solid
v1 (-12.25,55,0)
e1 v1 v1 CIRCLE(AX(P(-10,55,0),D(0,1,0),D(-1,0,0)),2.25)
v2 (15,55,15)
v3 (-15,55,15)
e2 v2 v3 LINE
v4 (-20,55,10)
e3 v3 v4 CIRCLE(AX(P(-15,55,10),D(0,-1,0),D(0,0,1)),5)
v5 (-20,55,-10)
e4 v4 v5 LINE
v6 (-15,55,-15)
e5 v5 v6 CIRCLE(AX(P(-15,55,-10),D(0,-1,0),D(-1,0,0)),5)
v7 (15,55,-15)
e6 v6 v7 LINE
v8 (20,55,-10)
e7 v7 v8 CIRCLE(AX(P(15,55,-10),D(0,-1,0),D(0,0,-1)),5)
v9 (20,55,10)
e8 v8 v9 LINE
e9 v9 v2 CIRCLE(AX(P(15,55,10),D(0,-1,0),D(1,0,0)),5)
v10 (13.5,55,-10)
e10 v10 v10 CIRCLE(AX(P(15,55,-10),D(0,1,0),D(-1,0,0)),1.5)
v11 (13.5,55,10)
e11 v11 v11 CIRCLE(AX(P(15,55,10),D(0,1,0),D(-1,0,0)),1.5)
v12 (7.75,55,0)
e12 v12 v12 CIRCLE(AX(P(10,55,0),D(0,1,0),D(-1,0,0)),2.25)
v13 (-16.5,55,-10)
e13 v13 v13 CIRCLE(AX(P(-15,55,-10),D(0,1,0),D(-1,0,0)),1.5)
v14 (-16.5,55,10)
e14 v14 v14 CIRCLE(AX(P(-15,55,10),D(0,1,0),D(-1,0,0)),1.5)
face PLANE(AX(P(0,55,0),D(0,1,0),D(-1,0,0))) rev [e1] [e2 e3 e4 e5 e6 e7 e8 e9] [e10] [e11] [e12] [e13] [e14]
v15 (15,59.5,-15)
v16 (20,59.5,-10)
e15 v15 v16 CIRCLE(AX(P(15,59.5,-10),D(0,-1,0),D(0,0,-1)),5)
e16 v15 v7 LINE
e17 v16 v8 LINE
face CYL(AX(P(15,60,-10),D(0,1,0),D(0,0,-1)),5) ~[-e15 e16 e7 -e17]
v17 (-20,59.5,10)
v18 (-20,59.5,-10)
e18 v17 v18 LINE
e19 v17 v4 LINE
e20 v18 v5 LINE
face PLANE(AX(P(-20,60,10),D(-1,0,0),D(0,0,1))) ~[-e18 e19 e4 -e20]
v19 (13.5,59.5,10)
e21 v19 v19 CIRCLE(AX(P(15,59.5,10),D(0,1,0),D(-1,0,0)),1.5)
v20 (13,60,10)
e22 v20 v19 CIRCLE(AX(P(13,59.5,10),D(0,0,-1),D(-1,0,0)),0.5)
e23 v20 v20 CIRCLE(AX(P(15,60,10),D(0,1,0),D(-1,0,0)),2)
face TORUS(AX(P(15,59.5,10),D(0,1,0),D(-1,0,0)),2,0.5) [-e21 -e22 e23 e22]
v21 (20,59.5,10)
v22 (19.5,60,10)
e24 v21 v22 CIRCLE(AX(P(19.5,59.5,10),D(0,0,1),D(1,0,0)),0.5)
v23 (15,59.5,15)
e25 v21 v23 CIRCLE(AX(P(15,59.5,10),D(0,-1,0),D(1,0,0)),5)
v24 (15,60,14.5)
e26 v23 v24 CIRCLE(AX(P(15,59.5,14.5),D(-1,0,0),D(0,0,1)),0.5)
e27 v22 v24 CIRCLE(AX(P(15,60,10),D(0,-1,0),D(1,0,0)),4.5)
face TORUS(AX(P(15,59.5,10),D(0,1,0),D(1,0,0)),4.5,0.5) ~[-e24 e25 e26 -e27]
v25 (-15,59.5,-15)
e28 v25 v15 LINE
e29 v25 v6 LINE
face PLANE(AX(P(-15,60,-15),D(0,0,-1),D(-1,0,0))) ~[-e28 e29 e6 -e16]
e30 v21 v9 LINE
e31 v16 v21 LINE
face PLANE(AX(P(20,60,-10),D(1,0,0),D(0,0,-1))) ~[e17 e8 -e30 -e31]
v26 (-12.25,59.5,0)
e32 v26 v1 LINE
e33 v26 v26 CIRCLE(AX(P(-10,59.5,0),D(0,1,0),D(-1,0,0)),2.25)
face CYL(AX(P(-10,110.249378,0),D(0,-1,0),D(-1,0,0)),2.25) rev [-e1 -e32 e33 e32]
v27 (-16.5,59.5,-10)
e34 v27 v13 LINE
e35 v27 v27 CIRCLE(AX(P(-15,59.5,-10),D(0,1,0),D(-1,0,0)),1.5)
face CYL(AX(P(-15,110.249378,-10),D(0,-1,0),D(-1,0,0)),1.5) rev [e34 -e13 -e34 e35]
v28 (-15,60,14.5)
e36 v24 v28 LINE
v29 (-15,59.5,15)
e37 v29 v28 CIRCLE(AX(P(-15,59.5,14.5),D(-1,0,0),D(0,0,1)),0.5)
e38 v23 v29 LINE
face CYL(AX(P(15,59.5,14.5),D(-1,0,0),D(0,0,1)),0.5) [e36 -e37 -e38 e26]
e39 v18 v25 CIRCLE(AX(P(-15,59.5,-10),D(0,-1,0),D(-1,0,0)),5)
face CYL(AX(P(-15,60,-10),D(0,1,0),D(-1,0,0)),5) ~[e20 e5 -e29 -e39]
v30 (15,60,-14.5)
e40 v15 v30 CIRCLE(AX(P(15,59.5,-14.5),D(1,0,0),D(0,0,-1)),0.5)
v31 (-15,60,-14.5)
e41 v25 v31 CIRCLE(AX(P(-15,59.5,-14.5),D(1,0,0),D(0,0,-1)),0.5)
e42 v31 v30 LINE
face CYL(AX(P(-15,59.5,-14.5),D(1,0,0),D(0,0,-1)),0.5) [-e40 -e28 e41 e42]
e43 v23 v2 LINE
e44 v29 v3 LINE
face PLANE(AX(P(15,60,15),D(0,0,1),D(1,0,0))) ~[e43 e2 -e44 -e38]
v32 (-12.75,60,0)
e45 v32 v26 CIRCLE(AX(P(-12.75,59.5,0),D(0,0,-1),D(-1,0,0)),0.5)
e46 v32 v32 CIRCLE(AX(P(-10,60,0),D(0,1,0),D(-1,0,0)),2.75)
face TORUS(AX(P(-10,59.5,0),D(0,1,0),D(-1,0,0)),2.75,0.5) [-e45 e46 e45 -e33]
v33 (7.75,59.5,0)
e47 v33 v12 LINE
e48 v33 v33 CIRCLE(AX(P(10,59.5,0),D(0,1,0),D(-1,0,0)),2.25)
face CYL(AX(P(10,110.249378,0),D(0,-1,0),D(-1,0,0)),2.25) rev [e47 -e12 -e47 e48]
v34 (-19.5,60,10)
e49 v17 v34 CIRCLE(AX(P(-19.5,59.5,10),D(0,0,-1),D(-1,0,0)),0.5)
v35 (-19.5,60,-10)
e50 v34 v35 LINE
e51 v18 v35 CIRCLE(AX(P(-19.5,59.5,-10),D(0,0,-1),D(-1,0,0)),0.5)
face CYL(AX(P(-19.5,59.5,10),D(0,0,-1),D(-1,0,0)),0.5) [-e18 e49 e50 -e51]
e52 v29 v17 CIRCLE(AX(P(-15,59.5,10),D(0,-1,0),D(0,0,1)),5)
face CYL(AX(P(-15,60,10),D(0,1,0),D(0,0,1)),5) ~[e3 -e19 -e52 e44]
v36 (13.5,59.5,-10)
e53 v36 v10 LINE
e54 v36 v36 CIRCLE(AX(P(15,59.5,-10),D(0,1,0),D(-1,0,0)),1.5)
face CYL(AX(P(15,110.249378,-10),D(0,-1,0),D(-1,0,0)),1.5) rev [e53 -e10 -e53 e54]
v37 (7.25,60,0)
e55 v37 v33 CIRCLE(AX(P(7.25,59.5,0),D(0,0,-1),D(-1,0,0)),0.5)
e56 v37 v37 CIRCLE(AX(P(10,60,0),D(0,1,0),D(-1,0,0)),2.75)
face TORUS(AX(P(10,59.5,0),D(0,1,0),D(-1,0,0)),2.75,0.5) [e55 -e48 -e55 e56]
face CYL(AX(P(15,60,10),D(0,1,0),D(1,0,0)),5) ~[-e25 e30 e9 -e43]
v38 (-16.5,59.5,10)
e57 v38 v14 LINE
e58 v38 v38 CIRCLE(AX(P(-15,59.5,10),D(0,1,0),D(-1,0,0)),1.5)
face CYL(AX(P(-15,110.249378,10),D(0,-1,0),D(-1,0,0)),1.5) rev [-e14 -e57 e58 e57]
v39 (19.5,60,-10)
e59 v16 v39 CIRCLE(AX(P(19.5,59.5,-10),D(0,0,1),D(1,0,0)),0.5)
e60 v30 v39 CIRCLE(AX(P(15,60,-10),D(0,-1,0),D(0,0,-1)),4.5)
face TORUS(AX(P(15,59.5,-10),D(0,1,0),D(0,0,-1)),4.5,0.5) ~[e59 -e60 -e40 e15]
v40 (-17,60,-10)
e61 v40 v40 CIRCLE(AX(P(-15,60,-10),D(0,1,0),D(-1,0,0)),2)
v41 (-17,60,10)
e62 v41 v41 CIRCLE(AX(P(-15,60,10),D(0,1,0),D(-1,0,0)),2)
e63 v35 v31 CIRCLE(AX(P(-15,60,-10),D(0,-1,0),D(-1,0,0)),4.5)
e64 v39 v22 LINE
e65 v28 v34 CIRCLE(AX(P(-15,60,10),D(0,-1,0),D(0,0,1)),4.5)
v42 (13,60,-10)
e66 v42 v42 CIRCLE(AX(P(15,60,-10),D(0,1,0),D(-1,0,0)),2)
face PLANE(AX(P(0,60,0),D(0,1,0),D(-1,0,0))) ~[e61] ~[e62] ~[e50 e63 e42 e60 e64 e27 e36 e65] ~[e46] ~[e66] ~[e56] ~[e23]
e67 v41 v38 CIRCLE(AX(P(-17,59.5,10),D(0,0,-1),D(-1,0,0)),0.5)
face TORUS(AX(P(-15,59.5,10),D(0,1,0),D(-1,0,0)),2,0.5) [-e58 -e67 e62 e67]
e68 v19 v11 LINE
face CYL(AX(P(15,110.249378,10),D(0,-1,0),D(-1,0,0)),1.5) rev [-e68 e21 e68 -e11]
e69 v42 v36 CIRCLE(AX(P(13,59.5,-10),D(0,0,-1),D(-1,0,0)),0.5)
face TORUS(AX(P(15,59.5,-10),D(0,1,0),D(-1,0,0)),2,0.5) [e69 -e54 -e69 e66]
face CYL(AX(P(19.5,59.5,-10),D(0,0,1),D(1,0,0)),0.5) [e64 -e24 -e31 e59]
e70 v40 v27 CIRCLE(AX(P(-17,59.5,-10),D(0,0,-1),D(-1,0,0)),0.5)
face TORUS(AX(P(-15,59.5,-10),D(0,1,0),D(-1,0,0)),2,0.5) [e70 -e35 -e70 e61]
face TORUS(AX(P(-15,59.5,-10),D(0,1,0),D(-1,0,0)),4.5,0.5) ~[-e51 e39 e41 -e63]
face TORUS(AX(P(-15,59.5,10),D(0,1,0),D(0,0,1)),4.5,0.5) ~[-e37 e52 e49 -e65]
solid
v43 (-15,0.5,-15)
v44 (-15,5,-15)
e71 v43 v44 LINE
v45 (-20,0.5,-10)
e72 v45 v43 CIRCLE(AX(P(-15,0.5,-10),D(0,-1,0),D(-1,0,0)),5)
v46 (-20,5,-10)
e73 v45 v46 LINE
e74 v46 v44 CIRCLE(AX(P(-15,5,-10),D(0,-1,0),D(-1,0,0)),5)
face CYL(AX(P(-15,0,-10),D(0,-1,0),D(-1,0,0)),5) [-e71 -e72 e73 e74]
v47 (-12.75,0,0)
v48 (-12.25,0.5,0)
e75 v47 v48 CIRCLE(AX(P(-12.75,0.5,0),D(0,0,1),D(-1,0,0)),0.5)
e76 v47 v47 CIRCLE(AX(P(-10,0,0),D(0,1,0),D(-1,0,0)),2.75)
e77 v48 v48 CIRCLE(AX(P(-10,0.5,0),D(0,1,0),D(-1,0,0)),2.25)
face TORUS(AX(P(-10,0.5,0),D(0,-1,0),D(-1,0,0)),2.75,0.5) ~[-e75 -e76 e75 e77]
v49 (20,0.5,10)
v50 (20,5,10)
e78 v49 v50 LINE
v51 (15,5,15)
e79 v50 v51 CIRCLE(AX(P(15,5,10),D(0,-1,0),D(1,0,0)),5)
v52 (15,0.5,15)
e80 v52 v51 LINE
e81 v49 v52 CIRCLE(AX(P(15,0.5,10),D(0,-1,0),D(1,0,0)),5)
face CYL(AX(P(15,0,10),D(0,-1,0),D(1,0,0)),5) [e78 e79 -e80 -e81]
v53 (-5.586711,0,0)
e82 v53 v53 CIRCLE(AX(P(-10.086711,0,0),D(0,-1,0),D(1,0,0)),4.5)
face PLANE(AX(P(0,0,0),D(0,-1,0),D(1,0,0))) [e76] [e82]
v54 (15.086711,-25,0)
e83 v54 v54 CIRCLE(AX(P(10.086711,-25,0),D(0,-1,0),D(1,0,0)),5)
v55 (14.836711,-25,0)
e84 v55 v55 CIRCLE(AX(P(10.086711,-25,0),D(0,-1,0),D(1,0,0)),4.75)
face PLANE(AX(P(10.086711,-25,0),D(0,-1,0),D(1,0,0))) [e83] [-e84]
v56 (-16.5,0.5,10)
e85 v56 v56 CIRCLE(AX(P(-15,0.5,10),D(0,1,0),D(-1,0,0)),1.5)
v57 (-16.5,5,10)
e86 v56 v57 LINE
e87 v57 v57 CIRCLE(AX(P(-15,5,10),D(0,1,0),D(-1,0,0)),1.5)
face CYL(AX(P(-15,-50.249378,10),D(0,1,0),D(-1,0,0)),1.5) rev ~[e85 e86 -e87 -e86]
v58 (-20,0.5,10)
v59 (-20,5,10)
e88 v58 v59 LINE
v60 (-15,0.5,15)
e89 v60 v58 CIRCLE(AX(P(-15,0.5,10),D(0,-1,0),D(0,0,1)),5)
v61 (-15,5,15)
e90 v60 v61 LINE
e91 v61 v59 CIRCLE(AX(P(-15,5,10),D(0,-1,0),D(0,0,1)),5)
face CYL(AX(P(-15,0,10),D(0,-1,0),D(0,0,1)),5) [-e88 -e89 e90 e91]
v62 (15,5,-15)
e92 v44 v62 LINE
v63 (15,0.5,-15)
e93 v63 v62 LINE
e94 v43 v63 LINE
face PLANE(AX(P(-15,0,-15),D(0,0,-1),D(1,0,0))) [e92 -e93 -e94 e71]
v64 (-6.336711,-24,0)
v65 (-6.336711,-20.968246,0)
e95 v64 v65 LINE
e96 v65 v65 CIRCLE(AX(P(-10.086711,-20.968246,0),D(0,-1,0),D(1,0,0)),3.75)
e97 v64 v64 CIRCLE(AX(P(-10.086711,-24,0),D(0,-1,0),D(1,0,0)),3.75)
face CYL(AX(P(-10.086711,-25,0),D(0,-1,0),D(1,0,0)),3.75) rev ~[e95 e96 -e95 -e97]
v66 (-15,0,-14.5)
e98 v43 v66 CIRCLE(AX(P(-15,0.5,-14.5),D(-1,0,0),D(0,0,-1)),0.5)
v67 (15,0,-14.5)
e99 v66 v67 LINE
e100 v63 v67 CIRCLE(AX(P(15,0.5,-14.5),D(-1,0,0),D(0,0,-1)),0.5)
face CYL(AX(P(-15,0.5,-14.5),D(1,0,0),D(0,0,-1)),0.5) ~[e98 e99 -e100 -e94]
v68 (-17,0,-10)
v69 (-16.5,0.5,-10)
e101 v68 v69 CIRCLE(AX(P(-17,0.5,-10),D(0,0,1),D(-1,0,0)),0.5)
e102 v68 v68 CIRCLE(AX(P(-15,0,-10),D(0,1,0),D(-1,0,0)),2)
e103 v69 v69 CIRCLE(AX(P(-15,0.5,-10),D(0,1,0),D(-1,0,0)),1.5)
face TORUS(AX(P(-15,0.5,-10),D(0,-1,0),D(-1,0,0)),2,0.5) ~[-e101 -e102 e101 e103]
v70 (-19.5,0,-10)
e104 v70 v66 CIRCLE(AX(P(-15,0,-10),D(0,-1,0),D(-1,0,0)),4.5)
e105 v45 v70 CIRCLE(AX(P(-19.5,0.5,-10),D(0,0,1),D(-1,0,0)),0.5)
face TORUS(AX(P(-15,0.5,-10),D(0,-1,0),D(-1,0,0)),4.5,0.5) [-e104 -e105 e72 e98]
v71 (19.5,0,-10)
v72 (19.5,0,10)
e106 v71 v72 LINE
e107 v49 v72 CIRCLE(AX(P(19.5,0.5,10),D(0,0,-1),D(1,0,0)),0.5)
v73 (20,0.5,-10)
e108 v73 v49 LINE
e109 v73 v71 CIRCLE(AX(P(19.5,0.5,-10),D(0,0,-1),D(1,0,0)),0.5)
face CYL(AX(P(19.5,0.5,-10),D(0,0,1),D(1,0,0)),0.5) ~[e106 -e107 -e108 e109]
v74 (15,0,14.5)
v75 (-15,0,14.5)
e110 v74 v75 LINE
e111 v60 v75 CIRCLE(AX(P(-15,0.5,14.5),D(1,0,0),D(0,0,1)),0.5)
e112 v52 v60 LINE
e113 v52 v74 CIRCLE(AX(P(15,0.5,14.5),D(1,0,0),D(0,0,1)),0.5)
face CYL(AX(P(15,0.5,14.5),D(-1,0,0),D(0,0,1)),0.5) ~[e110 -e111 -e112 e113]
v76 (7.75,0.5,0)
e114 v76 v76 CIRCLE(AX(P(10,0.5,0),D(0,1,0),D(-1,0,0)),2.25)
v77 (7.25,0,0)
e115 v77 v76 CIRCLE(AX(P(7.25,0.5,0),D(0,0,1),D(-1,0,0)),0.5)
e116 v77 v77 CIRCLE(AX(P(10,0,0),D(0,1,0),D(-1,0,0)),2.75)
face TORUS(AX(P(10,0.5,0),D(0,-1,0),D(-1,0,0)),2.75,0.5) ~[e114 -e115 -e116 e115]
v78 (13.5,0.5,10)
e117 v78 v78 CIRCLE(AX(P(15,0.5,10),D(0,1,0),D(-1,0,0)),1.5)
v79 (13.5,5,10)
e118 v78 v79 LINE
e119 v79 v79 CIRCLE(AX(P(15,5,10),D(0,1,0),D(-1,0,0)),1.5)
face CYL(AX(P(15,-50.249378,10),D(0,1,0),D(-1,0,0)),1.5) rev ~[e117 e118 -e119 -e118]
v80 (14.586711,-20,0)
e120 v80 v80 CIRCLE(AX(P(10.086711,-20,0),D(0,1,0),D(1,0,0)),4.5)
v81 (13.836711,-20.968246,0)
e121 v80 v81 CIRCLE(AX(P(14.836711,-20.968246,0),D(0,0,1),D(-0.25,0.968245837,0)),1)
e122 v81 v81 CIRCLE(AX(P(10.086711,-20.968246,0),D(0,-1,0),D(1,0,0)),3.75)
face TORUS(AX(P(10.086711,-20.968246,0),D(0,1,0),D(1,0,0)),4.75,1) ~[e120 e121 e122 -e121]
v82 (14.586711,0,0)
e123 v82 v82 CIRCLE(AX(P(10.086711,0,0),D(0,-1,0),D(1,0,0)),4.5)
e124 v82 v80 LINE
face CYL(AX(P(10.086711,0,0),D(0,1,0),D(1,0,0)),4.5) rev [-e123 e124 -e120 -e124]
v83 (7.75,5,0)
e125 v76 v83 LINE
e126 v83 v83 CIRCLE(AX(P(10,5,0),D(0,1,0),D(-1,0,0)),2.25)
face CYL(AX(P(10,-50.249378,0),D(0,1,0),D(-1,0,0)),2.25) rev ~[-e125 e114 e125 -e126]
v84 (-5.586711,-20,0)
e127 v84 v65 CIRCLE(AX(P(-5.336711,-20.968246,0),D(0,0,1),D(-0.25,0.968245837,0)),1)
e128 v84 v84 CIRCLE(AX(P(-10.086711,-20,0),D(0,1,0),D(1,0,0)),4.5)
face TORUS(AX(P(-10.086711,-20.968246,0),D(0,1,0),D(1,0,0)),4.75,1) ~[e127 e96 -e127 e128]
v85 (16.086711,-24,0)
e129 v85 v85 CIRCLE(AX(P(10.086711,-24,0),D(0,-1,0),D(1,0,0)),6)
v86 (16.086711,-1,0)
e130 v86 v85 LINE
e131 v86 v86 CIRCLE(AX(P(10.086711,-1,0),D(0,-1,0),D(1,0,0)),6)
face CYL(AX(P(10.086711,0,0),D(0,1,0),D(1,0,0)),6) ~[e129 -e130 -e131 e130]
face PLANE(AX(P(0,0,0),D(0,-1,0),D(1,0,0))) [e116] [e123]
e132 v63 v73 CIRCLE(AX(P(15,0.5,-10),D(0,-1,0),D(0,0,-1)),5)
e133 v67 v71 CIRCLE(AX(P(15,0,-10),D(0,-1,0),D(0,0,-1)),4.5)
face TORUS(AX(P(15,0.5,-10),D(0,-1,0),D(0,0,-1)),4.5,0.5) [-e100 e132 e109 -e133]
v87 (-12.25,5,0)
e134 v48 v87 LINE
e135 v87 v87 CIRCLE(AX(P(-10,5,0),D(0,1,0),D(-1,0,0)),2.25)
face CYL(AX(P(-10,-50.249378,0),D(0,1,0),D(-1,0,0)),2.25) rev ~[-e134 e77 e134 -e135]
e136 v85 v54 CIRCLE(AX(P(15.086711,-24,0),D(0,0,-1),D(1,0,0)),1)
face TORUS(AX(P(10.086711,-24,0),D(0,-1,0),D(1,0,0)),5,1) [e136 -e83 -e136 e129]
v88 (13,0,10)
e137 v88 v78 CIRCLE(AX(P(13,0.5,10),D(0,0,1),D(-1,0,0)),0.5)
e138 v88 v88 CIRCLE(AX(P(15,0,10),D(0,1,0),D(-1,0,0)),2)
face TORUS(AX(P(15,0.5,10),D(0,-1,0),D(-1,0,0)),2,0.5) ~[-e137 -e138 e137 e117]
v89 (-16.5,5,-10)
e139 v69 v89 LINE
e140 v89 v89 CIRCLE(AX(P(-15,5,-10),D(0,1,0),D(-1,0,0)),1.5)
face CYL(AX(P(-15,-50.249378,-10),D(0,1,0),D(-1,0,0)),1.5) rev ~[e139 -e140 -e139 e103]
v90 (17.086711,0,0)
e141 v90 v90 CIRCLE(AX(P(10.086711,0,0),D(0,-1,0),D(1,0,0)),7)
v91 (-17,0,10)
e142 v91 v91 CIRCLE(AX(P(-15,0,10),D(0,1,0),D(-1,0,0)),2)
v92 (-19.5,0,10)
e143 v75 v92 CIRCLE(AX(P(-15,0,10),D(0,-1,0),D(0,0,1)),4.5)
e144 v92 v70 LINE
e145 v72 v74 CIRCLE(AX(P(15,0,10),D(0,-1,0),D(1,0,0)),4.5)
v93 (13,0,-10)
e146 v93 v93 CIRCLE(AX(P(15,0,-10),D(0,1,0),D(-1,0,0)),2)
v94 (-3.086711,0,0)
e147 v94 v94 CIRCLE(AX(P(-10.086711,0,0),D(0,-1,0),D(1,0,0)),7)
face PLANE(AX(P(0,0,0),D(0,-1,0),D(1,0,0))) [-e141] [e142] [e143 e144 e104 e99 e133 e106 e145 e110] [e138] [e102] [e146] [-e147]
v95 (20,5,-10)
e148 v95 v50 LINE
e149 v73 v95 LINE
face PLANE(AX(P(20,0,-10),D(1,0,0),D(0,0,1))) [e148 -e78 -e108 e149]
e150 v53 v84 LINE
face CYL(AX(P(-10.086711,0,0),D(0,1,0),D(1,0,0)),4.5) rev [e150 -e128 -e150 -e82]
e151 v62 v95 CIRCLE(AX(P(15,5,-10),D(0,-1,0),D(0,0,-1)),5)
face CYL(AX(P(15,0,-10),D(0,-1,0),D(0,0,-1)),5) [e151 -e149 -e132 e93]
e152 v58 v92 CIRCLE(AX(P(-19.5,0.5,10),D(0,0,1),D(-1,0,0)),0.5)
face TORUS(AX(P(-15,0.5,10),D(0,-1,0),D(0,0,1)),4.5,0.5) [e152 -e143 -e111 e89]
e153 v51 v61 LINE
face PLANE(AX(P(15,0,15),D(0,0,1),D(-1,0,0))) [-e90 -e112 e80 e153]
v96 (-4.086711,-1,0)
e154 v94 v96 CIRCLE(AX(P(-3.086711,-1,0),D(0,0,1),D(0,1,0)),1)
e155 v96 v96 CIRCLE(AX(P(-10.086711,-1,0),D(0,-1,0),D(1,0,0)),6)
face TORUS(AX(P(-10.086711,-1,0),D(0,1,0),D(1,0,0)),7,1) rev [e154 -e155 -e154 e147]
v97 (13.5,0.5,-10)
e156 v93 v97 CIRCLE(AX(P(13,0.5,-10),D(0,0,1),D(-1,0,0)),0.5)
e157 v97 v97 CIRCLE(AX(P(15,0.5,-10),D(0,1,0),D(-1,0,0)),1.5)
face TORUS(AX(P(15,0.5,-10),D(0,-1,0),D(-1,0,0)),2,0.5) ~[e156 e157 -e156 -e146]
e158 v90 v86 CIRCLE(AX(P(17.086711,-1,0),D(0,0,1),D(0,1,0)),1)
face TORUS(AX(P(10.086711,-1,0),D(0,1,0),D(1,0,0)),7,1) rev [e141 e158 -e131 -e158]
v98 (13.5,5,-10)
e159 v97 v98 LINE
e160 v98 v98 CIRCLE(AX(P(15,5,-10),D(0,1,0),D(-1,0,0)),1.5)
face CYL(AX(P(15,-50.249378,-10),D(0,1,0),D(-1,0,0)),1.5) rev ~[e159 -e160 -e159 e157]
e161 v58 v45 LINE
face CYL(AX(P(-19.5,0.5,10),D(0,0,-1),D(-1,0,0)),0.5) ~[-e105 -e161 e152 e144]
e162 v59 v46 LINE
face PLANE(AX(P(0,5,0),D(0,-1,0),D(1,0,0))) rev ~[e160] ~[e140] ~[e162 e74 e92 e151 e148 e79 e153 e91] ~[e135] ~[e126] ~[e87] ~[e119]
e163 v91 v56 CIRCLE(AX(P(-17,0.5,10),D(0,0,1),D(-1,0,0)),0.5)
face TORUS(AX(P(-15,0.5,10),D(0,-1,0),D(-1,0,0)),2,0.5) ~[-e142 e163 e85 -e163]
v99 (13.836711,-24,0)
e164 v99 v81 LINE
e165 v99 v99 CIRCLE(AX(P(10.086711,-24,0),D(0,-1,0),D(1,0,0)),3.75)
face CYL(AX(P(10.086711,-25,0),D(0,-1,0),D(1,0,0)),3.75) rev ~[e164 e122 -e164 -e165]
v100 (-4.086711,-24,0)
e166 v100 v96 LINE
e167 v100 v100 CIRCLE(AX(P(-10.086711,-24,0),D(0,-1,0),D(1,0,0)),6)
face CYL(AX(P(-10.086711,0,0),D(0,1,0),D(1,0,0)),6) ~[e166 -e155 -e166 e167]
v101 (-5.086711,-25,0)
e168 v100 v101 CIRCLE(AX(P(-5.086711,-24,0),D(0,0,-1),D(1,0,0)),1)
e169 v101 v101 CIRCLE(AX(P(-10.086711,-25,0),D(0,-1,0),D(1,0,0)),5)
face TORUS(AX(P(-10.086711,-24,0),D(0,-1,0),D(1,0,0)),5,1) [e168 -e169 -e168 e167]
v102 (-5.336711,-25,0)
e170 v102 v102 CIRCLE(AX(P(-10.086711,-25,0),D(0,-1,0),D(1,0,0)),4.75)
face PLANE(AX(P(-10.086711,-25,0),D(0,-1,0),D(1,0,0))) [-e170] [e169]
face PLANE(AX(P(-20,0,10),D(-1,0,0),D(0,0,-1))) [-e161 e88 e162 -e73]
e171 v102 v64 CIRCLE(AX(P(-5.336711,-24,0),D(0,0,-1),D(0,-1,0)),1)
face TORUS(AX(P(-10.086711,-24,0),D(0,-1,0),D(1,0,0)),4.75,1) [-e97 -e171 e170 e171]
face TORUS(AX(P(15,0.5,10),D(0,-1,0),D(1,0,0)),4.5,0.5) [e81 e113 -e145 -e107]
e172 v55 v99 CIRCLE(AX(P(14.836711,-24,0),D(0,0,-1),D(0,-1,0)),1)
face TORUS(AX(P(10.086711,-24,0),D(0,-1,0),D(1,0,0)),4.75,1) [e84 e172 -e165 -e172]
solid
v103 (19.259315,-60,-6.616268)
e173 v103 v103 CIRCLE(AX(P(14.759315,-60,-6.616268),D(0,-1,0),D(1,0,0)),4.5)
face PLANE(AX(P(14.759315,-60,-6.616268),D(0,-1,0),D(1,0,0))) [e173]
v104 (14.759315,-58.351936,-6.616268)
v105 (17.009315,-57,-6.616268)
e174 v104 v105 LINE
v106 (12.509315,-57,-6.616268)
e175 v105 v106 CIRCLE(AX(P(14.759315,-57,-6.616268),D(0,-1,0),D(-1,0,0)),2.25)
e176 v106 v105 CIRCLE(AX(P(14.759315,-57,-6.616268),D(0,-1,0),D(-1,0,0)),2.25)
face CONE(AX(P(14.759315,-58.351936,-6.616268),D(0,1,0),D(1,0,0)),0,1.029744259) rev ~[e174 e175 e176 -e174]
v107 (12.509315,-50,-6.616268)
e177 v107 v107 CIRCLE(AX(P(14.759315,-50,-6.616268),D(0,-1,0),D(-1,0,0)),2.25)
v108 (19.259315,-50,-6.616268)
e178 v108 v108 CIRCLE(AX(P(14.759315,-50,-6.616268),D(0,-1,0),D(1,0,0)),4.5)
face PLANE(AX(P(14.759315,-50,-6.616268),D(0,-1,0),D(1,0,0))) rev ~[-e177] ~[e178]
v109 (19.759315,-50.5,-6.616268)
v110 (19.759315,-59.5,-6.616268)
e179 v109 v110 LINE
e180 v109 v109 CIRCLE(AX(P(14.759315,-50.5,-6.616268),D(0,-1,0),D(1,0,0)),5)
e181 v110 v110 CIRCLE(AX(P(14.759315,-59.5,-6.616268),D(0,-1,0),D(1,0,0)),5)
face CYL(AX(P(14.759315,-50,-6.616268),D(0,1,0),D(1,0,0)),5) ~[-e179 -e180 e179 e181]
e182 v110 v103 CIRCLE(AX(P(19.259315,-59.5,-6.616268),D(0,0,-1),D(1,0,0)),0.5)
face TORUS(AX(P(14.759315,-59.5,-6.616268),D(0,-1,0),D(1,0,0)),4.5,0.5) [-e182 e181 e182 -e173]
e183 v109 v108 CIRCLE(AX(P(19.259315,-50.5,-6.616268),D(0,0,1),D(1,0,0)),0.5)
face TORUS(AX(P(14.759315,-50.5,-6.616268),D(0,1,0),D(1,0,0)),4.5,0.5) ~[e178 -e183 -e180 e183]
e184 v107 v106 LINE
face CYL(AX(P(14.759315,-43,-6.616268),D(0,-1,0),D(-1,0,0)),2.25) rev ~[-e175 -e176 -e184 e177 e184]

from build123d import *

# Parameters (mm, degrees)
F1_DEPTH  = 5
F2_D      = 4.5
F3_D      = 3
F4_R      = 0.5
F7_R      = 6
F7_R_2    = 4.5
F8_DEPTH  = 25
F9_R      = 6
F9_R_2    = 4.5
F9_R_3    = 3.75
F10_DEPTH = 5
F13_R     = 5
F14_DEPTH = 10
F15_D     = 4.5
F15_DEPTH = 7
F15_TIP   = 1.3519363928
F16_R     = 0.5


# Not quite as in the source:
# - a fillet or chamfer that OpenCascade refuses, or shapes differently, is made with other operations: its cross-section is extruded or revolved along the edge and cut away or added


with BuildPart() as f1:
    # F0 (on Front) → F1 (new body)
    with BuildSketch(Plane.XZ):
        with BuildLine():
            Line((15, 15), (-15, 15))
            ThreePointArc((-15, 15), (-18.5355339059, 13.5355339059), (-20, 10))
            Line((-20, 10), (-20, -10))
            ThreePointArc((-20, -10), (-18.5355339059, -13.5355339059), (-15, -15))
            Line((-15, -15), (15, -15))
            ThreePointArc((15, -15), (18.5355339059, -13.5355339059), (20, -10))
            Line((20, -10), (20, 10))
            ThreePointArc((20, 10), (18.5355339059, 13.5355339059), (15, 15))
        make_face()
    extrude(amount=-F1_DEPTH)

    # F2 (through all)
    with Locations(Plane.XZ):
        with Locations((-10, 0), (10, 0)):
            Hole(F2_D / 2)

    # F3 (through all)
    with Locations(Plane.XZ):
        with Locations((-15, 10), (15, 10), (15, -10), (-15, -10)):
            Hole(F3_D / 2)

    # F4
    f4_edges = [f1.edges().sort_by_distance(p)[0] for p in [
        (0, 0, 15),
        (-18.535534, 0, 13.535534),
        (18.535534, 0, 13.535534),
        (20, 0, 0),
        (-20, 0, 0),
        (18.535534, 0, -13.535534),
        (-18.535534, 0, -13.535534),
        (0, 0, -15),
        (-16.5, 0, -10),
        (13.5, 0, -10),
        (-12.25, 0, 0),
        (-16.5, 0, 10),
        (7.75, 0, 0),
        (13.5, 0, 10),
    ]]
    fillet(f4_edges, radius=F4_R)


with BuildPart() as f6_1:
    # F6: instance of F1
    add(f1.part.mirror(Plane(origin=(0, 30, 0), x_dir=(1, 0, 0), z_dir=(0, 1, 0))))


with BuildPart() as f1_1:
    add(f1.part)

    # F7 (on face) → F8 (join)
    with BuildSketch(Plane.XZ):
        with Locations((10.0867114961, 0)):
            Circle(F7_R)
        with Locations((10.0867114961, 0)):
            Circle(F7_R_2, mode=Mode.SUBTRACT)
        with Locations((-10.0867114961, 0)):
            Circle(F7_R)
        with Locations((-10.0867114961, 0)):
            Circle(F7_R_2, mode=Mode.SUBTRACT)
    extrude(amount=F8_DEPTH)

    # F9 (on face) → F10 (join)
    with BuildSketch(Plane.XZ.offset(25)):
        with Locations((10.0867114961, 0)):
            Circle(F9_R)
        with Locations((10.0867114961, 0)):
            Circle(F9_R_2, mode=Mode.SUBTRACT)
        with Locations((-10.0867114961, 0)):
            Circle(F9_R)
        with Locations((-10.0867114961, 0)):
            Circle(F9_R_3, mode=Mode.SUBTRACT)
        with Locations((10.0867114961, 0)):
            Circle(F9_R_2)
        with Locations((10.0867114961, 0)):
            Circle(F9_R_3, mode=Mode.SUBTRACT)
    extrude(amount=-F10_DEPTH)

    # F11: fillet of radius 1 on 8 edges, made by hand

    # F11_s1 → F11_t2 (revolve)
    with BuildSketch(Plane.XY):
        with BuildLine():
            ThreePointArc((-3.0867114961, 0), (-3.7938182773, -0.2928932188), (-4.0867114961, -1))
            Line((-4.0867114961, -1), (-4.0867114961, 0))
            Line((-4.0867114961, 0), (-3.0867114961, 0))
        make_face()
    revolve(axis=Axis((-10.0867114961, 0, 0), (0, -1, 0)))

    # F11_s3 → F11_t4 (revolve)
    with BuildSketch(Plane.XY):
        with BuildLine():
            ThreePointArc((17.0867114961, 0), (16.3796047149, -0.2928932188), (16.0867114961, -1))
            Line((16.0867114961, -1), (16.0867114961, 0))
            Line((16.0867114961, 0), (17.0867114961, 0))
        make_face()
    revolve(axis=Axis((10.0867114961, 0, 0), (0, -1, 0)))

    # F11_s5 → F11_t6 (revolve, cut)
    with BuildSketch(Plane.XY):
        with BuildLine():
            ThreePointArc((16.0867114961, -24), (15.7938182773, -24.7071067812), (15.0867114961, -25))
            Line((15.0867114961, -25), (16.0867114961, -25))
            Line((16.0867114961, -25), (16.0867114961, -24))
        make_face()
    revolve(axis=Axis((10.0867114961, -25, 0), (0, -1, 0)), mode=Mode.SUBTRACT)

    # F11_s7 → F11_t8 (revolve, cut)
    with BuildSketch(Plane.XY):
        with BuildLine():
            ThreePointArc((14.8367114961, -25), (14.1296047149, -24.7071067812), (13.8367114961, -24))
            Line((13.8367114961, -24), (13.8367114961, -25))
            Line((13.8367114961, -25), (14.8367114961, -25))
        make_face()
    revolve(axis=Axis((10.0867114961, -25, 0), (0, -1, 0)), mode=Mode.SUBTRACT)

    # F11_s9 → F11_t10 (revolve, cut)
    with BuildSketch(Plane.XY):
        with BuildLine():
            ThreePointArc((14.5867114961, -20), (14.0461420811, -20.3558734009), (13.8367114961, -20.9682458366))
            Line((13.8367114961, -20.9682458366), (13.8367114961, -20))
            Line((13.8367114961, -20), (14.5867114961, -20))
        make_face()
    revolve(axis=Axis((10.0867114961, -20, 0), (0, -1, 0)), mode=Mode.SUBTRACT)

    # F11_s11 → F11_t12 (revolve, cut)
    with BuildSketch(Plane.XY):
        with BuildLine():
            ThreePointArc((-4.0867114961, -24), (-4.3796047149, -24.7071067812), (-5.0867114961, -25))
            Line((-5.0867114961, -25), (-4.0867114961, -25))
            Line((-4.0867114961, -25), (-4.0867114961, -24))
        make_face()
    revolve(axis=Axis((-10.0867114961, -25, 0), (0, -1, 0)), mode=Mode.SUBTRACT)

    # F11_s13 → F11_t14 (revolve, cut)
    with BuildSketch(Plane.XY):
        with BuildLine():
            ThreePointArc((-5.3367114961, -25), (-6.0438182773, -24.7071067812), (-6.3367114961, -24))
            Line((-6.3367114961, -24), (-6.3367114961, -25))
            Line((-6.3367114961, -25), (-5.3367114961, -25))
        make_face()
    revolve(axis=Axis((-10.0867114961, -25, 0), (0, -1, 0)), mode=Mode.SUBTRACT)

    # F11_s15 → F11_t16 (revolve, cut)
    with BuildSketch(Plane.XY):
        with BuildLine():
            ThreePointArc((-5.5867114961, -20), (-6.1272809112, -20.3558734009), (-6.3367114961, -20.9682458366))
            Line((-6.3367114961, -20.9682458366), (-6.3367114961, -20))
            Line((-6.3367114961, -20), (-5.5867114961, -20))
        make_face()
    revolve(axis=Axis((-10.0867114961, -20, 0), (0, -1, 0)), mode=Mode.SUBTRACT)


with BuildPart() as f14:
    # F13 (on offset) → F14 (new body)
    with BuildSketch(Plane.XZ.offset(50)):
        with Locations((14.7593151778, -6.616268307)):
            Circle(F13_R)
    extrude(amount=F14_DEPTH)

    # F15
    with Locations(Plane(origin=(0, -50, 0), x_dir=(1, 0, 0), z_dir=(0, 1, 0))):
        with Locations((14.7593151778, 6.616268307)):
            Hole(F15_D / 2, depth=F15_DEPTH)
            with Locations((0, 0, -(F15_DEPTH + F15_TIP / 2))):  # 118° drill point
                Cone(0, F15_D / 2, F15_TIP, mode=Mode.SUBTRACT)

    # F16
    f16_edges = [f14.edges().sort_by_distance(p)[0] for p in [
        (9.759315, -60, -6.616268),
        (9.759315, -50, -6.616268),
    ]]
    fillet(f16_edges, radius=F16_R)


solid = Compound([f6_1.part, f1_1.part, f14.part])
